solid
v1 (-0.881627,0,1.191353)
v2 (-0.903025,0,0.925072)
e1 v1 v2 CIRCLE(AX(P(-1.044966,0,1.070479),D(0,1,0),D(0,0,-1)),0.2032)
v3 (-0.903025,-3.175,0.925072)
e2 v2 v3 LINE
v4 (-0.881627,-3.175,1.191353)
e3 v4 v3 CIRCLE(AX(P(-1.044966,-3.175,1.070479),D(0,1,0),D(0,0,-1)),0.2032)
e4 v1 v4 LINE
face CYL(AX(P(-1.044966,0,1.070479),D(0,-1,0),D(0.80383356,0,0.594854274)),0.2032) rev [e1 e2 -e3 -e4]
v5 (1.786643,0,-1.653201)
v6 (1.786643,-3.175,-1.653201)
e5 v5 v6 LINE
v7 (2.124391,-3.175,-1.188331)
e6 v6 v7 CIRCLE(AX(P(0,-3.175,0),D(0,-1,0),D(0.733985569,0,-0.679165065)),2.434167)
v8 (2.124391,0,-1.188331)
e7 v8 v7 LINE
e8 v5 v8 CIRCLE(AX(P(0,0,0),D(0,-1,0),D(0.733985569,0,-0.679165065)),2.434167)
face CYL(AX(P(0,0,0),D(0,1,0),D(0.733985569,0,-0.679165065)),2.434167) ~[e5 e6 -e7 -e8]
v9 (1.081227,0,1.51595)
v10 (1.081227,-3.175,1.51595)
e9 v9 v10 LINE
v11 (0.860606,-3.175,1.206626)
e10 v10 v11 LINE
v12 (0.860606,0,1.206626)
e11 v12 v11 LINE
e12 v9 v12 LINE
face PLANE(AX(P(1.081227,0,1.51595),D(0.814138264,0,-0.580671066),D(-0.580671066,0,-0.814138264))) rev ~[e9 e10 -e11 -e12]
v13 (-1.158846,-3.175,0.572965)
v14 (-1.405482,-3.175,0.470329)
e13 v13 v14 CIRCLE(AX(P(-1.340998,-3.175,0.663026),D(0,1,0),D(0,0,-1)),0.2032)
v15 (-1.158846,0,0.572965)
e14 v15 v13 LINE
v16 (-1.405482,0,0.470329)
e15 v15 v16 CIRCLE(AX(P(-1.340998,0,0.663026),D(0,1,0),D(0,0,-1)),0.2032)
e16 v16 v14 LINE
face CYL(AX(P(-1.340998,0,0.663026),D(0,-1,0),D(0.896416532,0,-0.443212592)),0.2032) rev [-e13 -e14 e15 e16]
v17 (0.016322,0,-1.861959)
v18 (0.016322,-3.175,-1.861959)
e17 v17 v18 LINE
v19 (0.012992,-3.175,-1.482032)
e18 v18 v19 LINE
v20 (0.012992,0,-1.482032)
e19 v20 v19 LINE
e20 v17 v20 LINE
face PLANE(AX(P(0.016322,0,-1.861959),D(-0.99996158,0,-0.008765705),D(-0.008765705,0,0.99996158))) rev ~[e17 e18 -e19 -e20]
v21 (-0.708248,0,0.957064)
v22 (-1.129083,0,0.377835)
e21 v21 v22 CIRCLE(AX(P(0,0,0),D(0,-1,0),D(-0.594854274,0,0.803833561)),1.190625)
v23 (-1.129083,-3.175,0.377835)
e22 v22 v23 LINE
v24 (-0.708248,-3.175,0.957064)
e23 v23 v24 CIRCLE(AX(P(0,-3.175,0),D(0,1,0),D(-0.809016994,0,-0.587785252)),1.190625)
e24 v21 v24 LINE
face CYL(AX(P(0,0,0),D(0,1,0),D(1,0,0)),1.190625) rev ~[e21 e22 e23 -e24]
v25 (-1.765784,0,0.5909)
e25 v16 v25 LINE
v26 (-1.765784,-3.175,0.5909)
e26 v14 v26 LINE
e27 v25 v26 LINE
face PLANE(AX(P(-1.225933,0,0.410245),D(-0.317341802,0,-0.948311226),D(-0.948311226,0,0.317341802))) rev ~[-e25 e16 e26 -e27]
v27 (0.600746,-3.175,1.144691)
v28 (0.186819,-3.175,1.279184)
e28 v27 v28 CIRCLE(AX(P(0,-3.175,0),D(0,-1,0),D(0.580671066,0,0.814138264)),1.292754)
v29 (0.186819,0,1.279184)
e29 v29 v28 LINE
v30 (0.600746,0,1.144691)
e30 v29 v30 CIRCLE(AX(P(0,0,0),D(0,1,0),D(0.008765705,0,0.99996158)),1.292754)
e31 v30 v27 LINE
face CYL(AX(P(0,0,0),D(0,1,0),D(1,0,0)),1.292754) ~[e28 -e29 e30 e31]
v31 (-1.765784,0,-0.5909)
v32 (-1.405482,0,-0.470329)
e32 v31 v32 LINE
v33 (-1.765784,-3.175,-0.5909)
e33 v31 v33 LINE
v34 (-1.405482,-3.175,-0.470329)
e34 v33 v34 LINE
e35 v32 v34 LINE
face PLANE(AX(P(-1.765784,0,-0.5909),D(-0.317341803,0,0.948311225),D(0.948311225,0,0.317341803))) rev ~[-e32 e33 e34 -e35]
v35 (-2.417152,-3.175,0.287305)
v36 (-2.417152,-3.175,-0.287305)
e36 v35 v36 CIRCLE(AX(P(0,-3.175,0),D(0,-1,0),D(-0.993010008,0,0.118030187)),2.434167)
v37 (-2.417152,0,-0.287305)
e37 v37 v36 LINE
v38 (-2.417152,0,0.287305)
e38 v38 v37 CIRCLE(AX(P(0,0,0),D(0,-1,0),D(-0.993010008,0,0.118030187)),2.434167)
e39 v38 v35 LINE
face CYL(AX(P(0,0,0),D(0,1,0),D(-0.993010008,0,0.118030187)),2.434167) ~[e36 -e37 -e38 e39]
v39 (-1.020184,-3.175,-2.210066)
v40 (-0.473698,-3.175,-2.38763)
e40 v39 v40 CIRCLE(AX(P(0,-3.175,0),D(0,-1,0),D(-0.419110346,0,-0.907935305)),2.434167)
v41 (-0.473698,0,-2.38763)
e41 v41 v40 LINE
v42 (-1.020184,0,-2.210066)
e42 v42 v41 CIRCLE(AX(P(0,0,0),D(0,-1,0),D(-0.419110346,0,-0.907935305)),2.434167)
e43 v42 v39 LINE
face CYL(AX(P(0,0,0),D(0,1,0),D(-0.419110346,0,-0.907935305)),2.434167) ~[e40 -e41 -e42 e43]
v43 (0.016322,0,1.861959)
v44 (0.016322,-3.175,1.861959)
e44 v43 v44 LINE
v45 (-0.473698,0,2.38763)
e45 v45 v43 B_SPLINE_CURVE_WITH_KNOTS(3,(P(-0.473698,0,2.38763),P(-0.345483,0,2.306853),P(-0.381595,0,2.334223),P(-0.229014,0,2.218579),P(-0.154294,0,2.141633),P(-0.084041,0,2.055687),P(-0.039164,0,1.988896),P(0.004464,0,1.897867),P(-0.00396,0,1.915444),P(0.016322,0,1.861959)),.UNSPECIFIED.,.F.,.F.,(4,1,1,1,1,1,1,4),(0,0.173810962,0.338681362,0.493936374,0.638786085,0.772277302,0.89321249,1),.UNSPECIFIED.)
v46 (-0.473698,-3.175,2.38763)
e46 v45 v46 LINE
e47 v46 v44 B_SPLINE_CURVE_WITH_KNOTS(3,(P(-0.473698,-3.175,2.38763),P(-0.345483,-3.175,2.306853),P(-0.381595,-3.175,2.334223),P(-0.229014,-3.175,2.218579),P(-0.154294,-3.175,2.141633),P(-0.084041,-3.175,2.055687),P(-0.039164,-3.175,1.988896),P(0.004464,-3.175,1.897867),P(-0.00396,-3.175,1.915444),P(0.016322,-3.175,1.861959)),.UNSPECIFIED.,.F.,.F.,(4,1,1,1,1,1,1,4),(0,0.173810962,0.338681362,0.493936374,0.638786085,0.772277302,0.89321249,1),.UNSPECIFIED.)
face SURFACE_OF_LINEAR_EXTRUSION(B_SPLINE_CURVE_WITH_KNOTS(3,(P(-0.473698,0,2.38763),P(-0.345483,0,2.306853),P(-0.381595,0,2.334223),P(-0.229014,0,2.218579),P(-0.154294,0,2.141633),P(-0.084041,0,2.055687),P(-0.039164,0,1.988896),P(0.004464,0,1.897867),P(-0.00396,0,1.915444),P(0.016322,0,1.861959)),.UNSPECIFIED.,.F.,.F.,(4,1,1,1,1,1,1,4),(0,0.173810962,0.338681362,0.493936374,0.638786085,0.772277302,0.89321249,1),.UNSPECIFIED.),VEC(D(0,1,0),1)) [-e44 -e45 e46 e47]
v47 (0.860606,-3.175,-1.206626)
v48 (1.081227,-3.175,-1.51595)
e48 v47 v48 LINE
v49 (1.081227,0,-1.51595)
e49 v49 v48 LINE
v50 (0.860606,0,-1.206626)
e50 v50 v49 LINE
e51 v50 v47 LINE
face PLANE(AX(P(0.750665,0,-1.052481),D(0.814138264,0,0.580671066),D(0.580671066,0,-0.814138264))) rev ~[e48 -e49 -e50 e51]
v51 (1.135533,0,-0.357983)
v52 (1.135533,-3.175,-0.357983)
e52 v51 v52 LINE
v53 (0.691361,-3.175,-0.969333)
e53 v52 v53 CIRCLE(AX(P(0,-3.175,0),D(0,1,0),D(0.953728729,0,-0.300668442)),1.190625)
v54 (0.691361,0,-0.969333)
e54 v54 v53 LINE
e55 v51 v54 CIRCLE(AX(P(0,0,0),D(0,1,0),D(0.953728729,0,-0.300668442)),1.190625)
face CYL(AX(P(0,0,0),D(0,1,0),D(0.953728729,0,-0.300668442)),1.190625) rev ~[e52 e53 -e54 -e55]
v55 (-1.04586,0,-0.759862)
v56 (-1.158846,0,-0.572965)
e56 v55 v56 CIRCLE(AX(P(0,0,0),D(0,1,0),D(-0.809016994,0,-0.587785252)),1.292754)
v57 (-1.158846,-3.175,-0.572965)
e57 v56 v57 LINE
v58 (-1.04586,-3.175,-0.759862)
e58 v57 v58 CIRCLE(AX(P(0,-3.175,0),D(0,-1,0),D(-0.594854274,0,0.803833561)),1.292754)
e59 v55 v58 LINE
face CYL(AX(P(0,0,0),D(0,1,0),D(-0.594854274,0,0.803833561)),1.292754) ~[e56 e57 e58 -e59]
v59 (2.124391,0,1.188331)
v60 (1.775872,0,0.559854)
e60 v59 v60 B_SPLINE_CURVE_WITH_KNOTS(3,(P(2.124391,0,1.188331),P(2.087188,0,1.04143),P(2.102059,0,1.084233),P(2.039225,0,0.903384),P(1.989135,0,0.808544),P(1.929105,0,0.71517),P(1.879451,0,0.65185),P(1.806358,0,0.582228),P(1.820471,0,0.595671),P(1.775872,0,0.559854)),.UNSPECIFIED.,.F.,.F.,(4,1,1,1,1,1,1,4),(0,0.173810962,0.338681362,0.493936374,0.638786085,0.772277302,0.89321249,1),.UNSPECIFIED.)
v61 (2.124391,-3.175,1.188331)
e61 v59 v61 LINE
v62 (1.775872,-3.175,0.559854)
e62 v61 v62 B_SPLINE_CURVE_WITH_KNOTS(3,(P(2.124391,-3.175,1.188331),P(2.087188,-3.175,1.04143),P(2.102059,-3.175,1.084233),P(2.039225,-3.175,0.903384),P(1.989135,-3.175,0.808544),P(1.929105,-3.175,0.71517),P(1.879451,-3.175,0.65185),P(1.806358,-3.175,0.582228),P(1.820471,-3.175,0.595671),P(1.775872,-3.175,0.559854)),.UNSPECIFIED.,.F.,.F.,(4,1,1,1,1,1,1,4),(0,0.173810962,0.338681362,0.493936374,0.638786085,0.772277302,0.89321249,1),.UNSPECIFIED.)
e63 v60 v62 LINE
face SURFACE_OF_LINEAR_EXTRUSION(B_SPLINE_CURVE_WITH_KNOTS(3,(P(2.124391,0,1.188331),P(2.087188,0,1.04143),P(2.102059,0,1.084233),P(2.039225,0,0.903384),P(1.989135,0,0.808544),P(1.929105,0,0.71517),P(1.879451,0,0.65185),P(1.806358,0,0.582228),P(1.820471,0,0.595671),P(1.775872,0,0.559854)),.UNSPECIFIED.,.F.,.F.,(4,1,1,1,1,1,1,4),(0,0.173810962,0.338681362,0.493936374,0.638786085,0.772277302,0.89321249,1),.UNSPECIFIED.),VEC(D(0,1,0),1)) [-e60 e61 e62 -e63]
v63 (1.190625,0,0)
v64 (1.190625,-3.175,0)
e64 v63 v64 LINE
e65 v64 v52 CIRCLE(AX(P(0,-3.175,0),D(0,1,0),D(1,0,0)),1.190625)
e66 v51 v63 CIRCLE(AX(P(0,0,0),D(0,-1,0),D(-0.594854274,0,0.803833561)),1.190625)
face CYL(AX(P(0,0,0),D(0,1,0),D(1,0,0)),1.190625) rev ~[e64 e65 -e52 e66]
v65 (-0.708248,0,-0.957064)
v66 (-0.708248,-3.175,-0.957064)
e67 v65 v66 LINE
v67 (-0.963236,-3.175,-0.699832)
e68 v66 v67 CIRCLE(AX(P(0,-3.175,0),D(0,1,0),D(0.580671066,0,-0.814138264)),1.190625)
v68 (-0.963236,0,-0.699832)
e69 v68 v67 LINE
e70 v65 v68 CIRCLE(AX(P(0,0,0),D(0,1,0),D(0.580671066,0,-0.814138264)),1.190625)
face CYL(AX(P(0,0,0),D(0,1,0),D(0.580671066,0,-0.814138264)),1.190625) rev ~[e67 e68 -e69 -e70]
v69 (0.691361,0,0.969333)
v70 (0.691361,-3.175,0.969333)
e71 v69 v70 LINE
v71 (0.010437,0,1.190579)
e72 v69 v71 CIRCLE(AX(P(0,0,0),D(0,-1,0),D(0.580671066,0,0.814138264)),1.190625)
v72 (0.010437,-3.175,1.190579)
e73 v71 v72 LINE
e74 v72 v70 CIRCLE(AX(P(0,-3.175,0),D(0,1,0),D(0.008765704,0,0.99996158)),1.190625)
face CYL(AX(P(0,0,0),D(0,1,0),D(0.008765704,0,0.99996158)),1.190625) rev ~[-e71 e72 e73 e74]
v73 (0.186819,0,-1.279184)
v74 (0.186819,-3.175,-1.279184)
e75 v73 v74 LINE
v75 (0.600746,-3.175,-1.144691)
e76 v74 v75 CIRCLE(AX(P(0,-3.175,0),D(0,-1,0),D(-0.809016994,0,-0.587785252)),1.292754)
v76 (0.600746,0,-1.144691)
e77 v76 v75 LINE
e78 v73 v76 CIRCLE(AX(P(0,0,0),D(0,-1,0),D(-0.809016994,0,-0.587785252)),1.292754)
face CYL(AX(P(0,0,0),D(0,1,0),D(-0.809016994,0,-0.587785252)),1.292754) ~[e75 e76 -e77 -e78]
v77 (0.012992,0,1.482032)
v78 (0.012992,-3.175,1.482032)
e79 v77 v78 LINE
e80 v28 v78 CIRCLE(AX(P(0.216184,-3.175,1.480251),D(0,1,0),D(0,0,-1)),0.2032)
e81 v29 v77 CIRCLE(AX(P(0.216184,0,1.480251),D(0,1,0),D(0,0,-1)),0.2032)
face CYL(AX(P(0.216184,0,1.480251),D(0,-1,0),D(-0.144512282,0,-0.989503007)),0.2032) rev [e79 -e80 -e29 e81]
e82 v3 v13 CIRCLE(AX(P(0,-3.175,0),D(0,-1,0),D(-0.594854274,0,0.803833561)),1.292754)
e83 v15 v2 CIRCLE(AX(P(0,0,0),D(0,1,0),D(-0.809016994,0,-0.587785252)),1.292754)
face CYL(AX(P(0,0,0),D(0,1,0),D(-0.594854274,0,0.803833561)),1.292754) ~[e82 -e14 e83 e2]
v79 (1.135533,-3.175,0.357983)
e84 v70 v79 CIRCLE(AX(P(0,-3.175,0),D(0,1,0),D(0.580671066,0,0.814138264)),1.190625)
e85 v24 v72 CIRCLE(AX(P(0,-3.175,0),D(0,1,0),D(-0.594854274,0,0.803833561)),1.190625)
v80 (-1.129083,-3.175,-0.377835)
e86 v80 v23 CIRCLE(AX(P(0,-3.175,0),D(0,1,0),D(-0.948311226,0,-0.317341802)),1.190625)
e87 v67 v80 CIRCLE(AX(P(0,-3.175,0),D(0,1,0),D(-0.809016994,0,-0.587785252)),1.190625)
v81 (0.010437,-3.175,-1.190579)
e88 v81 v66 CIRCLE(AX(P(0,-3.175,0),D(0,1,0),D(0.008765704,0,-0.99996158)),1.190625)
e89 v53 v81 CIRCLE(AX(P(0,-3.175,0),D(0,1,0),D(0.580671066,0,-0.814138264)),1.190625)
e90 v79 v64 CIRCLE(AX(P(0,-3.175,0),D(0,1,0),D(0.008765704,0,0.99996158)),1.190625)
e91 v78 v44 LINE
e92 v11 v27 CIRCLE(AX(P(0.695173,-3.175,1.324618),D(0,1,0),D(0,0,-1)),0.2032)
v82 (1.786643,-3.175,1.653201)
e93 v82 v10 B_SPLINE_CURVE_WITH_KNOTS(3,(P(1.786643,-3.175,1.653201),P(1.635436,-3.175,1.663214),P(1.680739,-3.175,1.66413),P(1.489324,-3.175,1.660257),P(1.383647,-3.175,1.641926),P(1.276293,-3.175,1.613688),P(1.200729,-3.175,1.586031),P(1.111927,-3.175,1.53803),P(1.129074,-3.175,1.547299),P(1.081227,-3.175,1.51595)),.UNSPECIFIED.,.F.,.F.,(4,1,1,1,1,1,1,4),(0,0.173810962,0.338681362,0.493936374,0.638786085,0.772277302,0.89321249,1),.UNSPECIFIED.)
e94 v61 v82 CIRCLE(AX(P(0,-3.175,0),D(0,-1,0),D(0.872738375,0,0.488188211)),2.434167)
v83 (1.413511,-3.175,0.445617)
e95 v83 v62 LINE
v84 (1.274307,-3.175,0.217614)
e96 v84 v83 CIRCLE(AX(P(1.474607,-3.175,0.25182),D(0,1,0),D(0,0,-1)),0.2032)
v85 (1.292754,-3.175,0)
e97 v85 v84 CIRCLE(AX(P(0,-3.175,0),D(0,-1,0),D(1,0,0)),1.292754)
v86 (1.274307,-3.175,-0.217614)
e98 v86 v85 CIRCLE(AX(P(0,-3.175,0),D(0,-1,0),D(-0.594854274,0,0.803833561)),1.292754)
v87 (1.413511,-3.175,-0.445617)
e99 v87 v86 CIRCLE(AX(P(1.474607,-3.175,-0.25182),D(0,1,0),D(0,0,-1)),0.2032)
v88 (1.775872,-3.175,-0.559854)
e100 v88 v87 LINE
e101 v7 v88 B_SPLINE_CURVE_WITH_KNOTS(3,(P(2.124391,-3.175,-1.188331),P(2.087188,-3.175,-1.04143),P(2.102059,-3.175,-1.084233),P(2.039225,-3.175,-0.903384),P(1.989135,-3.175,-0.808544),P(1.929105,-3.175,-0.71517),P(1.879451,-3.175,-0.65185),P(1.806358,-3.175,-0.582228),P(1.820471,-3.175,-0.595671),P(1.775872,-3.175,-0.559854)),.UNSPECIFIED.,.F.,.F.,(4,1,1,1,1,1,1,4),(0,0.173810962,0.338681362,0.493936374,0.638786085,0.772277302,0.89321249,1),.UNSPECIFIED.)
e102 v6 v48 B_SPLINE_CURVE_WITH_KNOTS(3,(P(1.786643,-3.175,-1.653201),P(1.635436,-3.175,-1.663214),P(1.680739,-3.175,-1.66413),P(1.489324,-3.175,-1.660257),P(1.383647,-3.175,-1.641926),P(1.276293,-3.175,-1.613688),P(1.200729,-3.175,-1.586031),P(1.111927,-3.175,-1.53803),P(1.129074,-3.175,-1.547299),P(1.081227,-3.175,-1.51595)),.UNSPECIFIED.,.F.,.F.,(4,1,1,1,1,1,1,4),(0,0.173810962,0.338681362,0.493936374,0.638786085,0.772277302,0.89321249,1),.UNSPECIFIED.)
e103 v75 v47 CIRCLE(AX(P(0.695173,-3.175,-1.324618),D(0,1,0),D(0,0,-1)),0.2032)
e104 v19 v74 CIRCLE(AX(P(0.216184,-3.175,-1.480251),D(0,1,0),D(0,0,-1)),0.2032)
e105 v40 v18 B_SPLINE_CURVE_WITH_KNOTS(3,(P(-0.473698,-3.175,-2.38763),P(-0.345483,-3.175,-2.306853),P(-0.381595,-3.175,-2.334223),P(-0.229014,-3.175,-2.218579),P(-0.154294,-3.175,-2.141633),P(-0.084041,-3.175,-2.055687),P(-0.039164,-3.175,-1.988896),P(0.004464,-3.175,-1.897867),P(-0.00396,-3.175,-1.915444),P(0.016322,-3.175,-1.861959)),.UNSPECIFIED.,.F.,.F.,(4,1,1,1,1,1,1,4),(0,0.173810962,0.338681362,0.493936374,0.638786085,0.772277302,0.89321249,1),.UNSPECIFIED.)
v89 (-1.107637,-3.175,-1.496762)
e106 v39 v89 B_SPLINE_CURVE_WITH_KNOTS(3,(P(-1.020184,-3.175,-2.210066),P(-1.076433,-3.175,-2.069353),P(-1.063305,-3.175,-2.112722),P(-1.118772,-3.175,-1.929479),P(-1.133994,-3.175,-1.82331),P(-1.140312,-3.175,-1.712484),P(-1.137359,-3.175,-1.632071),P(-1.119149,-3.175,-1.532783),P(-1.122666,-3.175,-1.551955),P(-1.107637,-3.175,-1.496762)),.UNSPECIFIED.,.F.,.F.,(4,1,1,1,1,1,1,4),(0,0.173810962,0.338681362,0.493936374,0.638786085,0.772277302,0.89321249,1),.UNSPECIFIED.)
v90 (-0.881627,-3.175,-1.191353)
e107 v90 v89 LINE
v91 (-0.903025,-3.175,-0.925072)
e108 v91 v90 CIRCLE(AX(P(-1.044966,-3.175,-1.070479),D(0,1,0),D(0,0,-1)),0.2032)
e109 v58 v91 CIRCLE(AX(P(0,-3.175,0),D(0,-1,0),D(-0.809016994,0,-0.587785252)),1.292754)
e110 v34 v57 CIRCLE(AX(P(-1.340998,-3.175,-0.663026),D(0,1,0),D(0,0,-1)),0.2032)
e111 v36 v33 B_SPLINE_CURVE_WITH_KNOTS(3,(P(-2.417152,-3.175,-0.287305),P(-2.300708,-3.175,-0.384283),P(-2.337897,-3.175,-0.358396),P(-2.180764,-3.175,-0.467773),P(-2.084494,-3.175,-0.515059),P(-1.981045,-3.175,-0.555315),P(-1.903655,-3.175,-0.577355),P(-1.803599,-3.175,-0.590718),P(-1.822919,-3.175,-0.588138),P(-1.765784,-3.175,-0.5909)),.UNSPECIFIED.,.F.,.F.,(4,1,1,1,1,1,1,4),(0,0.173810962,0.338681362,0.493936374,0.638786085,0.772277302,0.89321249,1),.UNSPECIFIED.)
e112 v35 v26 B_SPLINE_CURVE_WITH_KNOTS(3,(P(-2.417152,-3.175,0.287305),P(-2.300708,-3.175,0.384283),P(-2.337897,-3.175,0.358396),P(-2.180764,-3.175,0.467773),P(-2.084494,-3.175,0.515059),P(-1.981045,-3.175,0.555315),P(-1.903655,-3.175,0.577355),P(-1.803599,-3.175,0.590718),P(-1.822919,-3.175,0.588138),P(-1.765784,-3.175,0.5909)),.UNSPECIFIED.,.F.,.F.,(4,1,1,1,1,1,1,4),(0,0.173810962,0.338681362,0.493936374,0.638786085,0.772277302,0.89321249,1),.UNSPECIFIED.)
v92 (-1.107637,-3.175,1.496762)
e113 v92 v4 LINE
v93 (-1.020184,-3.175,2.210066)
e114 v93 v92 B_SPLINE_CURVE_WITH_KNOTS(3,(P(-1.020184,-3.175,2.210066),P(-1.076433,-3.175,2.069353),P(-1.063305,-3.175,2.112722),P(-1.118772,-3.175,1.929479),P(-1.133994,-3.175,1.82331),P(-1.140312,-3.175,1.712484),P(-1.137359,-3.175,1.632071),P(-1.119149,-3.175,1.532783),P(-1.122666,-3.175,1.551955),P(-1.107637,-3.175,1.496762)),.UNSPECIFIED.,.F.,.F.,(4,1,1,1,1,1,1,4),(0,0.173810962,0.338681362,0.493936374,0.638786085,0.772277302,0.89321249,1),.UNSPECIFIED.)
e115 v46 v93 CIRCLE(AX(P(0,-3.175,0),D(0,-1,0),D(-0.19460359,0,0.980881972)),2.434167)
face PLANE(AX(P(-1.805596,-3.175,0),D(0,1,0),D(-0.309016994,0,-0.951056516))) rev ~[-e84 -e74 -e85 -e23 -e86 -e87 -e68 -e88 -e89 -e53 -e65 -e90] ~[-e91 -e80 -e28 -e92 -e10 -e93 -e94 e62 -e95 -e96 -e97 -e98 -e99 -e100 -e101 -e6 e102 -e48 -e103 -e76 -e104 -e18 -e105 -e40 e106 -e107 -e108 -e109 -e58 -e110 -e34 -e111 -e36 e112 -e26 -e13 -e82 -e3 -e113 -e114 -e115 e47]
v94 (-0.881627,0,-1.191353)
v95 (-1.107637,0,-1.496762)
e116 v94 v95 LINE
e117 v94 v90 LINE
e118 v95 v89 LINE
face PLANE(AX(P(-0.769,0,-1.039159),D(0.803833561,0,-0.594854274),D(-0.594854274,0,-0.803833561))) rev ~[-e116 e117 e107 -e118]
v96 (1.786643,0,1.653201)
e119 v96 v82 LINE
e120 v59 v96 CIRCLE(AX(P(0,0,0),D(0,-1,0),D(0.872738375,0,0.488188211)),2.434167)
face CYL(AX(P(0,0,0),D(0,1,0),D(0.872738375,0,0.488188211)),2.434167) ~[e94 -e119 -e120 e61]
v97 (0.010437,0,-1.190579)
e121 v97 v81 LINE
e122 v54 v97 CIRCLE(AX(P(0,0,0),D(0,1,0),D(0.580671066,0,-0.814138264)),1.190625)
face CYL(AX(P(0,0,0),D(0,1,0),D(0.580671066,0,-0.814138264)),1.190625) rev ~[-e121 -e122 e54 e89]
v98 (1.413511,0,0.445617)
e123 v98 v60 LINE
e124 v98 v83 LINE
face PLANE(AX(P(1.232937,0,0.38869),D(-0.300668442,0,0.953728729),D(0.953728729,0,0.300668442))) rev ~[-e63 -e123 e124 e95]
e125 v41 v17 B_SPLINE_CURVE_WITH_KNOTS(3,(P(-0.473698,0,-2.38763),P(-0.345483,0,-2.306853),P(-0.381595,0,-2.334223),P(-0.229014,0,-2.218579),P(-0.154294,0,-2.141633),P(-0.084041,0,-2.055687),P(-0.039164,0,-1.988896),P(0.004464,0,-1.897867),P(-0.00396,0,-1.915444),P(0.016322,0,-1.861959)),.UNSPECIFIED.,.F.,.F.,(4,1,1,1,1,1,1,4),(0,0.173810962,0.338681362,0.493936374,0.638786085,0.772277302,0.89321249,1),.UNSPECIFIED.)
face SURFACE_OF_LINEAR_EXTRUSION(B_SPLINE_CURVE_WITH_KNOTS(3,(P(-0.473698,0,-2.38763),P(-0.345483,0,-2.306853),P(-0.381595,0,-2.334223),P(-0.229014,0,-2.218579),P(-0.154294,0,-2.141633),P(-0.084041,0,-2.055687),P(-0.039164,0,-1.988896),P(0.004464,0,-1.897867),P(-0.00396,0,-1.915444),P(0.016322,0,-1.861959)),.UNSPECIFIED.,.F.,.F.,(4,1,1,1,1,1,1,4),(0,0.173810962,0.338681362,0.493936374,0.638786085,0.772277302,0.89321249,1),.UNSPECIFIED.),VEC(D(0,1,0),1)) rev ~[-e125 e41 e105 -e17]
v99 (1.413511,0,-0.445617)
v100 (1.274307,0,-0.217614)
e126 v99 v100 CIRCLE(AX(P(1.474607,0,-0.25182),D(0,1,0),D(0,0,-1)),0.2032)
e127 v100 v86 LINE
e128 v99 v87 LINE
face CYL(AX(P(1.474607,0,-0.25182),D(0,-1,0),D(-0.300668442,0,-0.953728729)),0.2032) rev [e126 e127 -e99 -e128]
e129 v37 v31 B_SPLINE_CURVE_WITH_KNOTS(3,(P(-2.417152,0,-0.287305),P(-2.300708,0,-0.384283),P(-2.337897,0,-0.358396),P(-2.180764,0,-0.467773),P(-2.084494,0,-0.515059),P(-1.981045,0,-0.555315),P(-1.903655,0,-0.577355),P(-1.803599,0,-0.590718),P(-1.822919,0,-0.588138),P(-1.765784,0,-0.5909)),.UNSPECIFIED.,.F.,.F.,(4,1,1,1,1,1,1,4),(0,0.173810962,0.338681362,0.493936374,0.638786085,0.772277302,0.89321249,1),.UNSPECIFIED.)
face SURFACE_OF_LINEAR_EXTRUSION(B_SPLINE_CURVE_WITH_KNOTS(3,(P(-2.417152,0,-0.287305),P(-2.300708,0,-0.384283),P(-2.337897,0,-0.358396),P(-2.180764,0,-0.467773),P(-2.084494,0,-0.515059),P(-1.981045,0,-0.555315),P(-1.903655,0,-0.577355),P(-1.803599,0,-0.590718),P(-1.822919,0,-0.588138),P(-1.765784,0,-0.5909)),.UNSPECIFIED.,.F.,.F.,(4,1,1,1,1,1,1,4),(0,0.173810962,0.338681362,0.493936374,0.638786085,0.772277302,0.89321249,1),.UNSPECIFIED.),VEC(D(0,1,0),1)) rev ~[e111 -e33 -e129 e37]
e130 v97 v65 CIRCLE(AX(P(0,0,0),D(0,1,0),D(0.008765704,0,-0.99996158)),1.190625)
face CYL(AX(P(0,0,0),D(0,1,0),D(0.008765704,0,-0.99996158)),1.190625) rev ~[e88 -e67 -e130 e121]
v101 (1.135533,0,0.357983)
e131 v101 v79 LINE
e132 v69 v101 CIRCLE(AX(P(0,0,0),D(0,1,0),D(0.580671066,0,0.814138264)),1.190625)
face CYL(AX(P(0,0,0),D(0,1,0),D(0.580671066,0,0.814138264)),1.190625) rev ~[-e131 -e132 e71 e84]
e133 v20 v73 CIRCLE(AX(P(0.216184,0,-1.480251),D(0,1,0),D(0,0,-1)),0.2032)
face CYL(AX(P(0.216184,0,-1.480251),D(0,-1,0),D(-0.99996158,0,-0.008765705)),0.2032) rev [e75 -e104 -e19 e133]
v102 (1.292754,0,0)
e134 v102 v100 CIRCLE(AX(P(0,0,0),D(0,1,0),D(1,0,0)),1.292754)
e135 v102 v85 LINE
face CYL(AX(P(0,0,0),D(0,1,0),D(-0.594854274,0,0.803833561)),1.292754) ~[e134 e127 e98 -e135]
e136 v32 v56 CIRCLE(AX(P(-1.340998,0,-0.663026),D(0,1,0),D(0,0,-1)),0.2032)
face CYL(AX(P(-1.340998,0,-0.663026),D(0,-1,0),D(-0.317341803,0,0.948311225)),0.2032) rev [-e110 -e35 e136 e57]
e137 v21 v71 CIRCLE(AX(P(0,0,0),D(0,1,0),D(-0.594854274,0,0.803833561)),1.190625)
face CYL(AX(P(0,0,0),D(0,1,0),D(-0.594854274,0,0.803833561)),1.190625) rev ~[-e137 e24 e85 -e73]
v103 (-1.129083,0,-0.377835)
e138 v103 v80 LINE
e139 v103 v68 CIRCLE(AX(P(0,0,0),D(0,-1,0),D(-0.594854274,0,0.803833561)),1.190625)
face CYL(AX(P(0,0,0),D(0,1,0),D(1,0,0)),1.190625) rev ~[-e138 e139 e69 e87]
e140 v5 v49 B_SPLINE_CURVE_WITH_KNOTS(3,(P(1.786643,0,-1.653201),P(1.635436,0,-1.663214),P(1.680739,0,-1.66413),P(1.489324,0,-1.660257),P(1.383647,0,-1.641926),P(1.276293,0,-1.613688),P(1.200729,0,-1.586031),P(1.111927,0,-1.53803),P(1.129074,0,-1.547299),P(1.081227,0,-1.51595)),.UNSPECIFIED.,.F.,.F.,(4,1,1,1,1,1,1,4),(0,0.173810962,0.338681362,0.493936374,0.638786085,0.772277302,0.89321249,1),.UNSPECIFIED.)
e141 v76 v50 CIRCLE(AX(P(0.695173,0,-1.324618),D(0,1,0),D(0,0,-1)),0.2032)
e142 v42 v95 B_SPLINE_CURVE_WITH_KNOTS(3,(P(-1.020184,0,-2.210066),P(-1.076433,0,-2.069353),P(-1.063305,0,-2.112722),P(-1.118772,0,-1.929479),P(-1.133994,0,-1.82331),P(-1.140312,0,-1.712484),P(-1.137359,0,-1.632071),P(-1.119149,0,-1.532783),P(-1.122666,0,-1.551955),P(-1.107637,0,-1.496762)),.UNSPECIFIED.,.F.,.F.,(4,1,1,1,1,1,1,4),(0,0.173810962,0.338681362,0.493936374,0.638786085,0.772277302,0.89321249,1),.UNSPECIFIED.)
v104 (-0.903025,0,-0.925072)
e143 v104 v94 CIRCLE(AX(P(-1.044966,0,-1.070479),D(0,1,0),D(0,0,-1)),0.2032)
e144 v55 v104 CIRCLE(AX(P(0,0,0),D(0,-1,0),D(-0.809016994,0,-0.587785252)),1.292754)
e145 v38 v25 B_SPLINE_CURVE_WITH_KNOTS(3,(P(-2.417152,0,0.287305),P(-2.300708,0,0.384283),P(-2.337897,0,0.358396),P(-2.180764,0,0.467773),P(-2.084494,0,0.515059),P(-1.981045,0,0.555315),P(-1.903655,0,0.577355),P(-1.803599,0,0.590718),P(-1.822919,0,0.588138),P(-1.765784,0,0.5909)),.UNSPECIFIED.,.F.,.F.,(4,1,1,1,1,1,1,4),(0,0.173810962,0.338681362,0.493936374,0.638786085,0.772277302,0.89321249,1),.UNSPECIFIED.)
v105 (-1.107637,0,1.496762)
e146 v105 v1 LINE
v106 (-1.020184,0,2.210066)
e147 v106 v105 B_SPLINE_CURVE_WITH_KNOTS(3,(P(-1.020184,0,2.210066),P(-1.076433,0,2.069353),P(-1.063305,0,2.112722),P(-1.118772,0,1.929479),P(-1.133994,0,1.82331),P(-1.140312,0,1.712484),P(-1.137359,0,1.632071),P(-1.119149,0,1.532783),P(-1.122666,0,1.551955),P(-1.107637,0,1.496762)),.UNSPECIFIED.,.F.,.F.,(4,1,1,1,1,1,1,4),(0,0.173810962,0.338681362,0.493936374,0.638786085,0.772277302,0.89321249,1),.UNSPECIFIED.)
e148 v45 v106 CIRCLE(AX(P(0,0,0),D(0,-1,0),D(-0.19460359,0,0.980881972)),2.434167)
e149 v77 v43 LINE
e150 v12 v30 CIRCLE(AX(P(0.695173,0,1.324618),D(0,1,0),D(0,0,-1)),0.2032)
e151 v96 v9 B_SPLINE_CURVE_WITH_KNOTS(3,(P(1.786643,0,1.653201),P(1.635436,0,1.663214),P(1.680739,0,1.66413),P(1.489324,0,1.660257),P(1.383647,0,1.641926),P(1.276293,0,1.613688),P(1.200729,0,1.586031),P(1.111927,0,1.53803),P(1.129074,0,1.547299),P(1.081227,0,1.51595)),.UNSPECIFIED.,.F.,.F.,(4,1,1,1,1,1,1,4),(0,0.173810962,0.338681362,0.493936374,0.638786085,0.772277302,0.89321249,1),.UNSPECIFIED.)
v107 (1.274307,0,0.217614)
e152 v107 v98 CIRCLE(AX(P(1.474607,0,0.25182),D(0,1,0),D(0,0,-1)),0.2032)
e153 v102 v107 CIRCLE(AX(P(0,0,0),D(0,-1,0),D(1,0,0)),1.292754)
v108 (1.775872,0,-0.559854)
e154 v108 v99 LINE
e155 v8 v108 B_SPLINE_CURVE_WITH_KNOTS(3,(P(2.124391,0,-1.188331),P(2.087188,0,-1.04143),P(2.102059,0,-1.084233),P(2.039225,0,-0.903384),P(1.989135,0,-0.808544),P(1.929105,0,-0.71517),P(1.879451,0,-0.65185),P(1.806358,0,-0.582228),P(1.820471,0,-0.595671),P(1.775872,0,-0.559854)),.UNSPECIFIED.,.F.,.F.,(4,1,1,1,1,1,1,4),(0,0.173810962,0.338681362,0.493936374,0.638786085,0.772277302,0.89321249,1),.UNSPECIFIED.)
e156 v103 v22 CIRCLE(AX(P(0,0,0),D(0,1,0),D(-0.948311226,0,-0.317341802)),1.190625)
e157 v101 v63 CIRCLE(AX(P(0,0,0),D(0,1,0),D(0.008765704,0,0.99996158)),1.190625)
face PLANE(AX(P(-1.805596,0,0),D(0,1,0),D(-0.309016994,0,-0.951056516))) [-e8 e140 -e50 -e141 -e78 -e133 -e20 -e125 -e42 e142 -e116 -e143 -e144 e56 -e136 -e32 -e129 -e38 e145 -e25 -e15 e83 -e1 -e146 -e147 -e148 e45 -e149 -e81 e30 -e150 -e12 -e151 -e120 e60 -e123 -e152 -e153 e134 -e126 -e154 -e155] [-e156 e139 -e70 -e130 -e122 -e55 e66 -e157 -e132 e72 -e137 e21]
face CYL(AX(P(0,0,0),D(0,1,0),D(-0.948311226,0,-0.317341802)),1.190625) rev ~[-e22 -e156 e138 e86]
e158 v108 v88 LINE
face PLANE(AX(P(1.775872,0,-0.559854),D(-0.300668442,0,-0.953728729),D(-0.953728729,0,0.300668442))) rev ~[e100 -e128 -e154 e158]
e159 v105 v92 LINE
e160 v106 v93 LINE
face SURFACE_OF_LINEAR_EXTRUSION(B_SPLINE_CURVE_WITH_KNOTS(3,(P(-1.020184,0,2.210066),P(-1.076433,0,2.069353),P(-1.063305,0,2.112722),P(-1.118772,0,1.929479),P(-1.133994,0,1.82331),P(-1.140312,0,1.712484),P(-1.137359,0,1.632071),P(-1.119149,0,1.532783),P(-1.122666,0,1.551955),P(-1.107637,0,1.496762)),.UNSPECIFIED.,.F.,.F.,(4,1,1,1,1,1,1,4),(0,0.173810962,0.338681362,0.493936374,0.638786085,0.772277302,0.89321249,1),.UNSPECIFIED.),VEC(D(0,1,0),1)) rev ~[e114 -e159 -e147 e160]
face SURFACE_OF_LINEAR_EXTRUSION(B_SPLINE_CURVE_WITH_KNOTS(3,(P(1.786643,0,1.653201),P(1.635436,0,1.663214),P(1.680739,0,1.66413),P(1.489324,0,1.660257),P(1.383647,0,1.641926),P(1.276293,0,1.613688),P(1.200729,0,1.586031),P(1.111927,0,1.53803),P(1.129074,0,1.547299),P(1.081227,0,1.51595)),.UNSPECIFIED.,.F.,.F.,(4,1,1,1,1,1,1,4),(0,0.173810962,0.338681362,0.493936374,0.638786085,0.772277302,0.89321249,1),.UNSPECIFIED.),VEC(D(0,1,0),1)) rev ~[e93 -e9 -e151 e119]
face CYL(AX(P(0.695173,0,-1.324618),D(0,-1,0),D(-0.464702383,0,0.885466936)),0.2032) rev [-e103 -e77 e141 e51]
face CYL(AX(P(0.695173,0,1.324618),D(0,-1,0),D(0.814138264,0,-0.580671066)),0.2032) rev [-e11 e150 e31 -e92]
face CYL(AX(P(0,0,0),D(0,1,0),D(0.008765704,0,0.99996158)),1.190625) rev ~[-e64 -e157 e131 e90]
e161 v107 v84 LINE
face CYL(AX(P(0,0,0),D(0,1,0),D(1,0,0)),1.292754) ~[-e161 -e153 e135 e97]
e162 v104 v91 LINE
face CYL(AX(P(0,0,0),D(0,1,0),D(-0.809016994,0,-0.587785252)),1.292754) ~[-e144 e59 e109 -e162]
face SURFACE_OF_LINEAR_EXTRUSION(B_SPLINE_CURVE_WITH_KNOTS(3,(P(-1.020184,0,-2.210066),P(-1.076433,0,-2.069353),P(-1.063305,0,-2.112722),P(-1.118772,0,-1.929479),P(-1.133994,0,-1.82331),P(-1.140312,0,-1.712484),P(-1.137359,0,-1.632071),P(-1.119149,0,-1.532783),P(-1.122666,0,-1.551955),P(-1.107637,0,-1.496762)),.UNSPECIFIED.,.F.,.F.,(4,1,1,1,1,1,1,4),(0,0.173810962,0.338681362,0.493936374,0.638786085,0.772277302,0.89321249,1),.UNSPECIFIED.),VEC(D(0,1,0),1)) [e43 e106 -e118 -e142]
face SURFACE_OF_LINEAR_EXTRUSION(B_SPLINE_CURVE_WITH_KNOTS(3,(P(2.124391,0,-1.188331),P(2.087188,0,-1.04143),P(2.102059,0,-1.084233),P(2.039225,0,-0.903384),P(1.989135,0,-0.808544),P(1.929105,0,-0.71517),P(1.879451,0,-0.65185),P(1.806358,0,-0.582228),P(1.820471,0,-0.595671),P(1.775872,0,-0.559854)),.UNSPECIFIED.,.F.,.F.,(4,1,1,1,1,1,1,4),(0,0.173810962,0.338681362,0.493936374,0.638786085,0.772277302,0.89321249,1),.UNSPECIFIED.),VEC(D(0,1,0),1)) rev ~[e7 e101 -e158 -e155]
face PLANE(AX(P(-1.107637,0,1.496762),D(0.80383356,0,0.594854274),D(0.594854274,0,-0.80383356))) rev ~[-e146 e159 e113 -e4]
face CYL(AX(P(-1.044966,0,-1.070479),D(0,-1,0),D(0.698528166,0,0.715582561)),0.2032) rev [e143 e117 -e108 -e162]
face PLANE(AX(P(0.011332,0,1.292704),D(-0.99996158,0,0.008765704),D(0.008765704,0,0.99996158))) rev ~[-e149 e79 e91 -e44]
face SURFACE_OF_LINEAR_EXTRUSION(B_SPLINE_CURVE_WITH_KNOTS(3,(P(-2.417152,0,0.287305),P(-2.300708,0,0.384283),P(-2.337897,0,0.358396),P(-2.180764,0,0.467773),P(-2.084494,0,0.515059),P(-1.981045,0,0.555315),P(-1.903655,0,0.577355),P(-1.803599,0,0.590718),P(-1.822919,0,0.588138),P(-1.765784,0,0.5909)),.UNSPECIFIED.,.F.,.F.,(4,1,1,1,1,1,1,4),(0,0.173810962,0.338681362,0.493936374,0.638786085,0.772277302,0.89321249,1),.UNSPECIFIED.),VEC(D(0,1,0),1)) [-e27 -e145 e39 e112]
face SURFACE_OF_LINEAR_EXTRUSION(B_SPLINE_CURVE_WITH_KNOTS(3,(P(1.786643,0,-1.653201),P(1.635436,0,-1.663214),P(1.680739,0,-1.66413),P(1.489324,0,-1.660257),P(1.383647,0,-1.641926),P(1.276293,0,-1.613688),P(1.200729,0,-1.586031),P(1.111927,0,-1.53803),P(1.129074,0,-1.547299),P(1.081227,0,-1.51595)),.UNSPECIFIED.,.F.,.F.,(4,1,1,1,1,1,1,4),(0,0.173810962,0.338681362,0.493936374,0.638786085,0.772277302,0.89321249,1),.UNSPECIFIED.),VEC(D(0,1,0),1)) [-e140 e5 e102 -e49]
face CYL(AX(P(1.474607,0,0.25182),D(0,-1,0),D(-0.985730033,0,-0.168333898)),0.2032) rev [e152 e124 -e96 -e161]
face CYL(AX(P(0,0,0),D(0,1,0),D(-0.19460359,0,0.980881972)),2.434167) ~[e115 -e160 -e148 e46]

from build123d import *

# Parameters (mm, degrees)
F3_DEPTH        = 3.175
F3_COPIES_COUNT = 5
F4_R            = 0.2032


# Not quite as in the source:
# - a feature of the source that left no trace in its solid (it failed there, or was rolled back) is left out
# - a pattern or mirror of a feature is missing from the dataset's text; its kind, count and spacing are read off the source's solid


with BuildPart() as f3:
    # F2 (on Front) → F3 (new body)
    with BuildSketch(Plane.XZ):
        with BuildLine():
            add(Edge.make_bspline(
                [(-0.4736975711, 2.3876302001), (-0.3454827241, 2.306853053), (-0.3815948665, 2.3342231222), (-0.2290140547, 2.2185792667), (-0.1542942205, 2.1416333305), (-0.084040716, 2.0556874167), (-0.0391643261, 1.9888964707), (0.0044637369, 1.8978667818), (-0.0039604646, 1.9154438273), (0.0163220053, 1.8619585339)],
                knots=[0, 0, 0, 0, 0.1738109625, 0.3386813621, 0.4939363745, 0.6387860849, 0.7722773022, 0.8932124897, 1, 1, 1, 1], degree=3))
            ThreePointArc((-0.4736975711, 2.3876302001), (-0.7521988671, 2.3150300701), (-1.0201844344, 2.2100658545))
            add(Edge.make_bspline(
                [(-1.0201844344, 2.2100658545), (-1.0764328087, 2.0693529736), (-1.0633051948, 2.1127220094), (-1.1187719118, 1.929479414), (-1.133993841, 1.8233096274), (-1.1403123794, 1.7124839487), (-1.1373594084, 1.6320712581), (-1.1191493442, 1.5327827608), (-1.1226655501, 1.5519545107), (-1.1076365463, 1.4967622627)],
                knots=[0, 0, 0, 0, 0.1738109625, 0.3386813621, 0.4939363745, 0.6387860849, 0.7722773022, 0.8932124897, 1, 1, 1, 1], degree=3))
            Line((-1.1076365463, 1.4967622627), (-0.7690003409, 1.0391591847))
            ThreePointArc((-0.7690003409, 1.0391591847), (-0.399483007, 1.2294822742), (0.011331901, 1.2927044997))
            Line((0.011331901, 1.2927044997), (0.0163220053, 1.8619585339))
        make_face()
        with BuildLine():
            Line((0.0104366669, 1.1905792568), (0.011331901, 1.2927044997))
            ThreePointArc((0.011331901, 1.2927044997), (-0.399483007, 1.2294822742), (-0.7690003409, 1.0391591847))
            Line((-0.7690003409, 1.0391591847), (-0.7082483697, 0.957064333))
            ThreePointArc((-0.7082483697, 0.957064333), (-0.3679233589, 1.1323516647), (0.0104366669, 1.1905792568))
        make_face()
        with BuildLine():
            ThreePointArc((1.2927541667, 0), (0.9181129281, 0.9100999872), (0.011331901, 1.2927044997))
            Line((0.011331901, 1.2927044997), (0.0104366669, 1.1905792568))
            ThreePointArc((0.0104366669, 1.1905792568), (0.8455808794, 0.8382009706), (1.190625, 0))
            ThreePointArc((1.190625, 0), (-0.5358776332, -1.06321355), (-0.7082483697, 0.957064333))
            Line((-0.7082483697, 0.957064333), (-0.7690003409, 1.0391591847))
            ThreePointArc((-0.7690003409, 1.0391591847), (-0.5818440257, -1.1544136456), (1.2927541667, 0))
        make_face()
    extrude(amount=F3_DEPTH)

    # F3_copies: F3 ×5 about axis
    f3_copies_axis = Axis((0, 0, 0), (0, 1, 0))


with BuildPart() as f3_1:
    add(f3.part)
    for i in range(1, F3_COPIES_COUNT):
        add(f3.part.rotate(f3_copies_axis, i * 360 / F3_COPIES_COUNT))

    # F4
    f4_edges = [f3_1.edges().sort_by_distance(p)[0] for p in [
        (-1.225933, -1.5875, 0.410245),
        (-0.769, -1.5875, 1.039159),
        (-1.225933, -1.5875, -0.410245),
        (-0.769, -1.5875, -1.039159),
        (0.011332, -1.5875, -1.292704),
        (0.750665, -1.5875, -1.052481),
        (1.232937, -1.5875, -0.38869),
        (1.232937, -1.5875, 0.38869),
        (0.750665, -1.5875, 1.052481),
        (0.011332, -1.5875, 1.292704),
    ]]
    fillet(f4_edges, radius=F4_R)


solid = f3_1.part
